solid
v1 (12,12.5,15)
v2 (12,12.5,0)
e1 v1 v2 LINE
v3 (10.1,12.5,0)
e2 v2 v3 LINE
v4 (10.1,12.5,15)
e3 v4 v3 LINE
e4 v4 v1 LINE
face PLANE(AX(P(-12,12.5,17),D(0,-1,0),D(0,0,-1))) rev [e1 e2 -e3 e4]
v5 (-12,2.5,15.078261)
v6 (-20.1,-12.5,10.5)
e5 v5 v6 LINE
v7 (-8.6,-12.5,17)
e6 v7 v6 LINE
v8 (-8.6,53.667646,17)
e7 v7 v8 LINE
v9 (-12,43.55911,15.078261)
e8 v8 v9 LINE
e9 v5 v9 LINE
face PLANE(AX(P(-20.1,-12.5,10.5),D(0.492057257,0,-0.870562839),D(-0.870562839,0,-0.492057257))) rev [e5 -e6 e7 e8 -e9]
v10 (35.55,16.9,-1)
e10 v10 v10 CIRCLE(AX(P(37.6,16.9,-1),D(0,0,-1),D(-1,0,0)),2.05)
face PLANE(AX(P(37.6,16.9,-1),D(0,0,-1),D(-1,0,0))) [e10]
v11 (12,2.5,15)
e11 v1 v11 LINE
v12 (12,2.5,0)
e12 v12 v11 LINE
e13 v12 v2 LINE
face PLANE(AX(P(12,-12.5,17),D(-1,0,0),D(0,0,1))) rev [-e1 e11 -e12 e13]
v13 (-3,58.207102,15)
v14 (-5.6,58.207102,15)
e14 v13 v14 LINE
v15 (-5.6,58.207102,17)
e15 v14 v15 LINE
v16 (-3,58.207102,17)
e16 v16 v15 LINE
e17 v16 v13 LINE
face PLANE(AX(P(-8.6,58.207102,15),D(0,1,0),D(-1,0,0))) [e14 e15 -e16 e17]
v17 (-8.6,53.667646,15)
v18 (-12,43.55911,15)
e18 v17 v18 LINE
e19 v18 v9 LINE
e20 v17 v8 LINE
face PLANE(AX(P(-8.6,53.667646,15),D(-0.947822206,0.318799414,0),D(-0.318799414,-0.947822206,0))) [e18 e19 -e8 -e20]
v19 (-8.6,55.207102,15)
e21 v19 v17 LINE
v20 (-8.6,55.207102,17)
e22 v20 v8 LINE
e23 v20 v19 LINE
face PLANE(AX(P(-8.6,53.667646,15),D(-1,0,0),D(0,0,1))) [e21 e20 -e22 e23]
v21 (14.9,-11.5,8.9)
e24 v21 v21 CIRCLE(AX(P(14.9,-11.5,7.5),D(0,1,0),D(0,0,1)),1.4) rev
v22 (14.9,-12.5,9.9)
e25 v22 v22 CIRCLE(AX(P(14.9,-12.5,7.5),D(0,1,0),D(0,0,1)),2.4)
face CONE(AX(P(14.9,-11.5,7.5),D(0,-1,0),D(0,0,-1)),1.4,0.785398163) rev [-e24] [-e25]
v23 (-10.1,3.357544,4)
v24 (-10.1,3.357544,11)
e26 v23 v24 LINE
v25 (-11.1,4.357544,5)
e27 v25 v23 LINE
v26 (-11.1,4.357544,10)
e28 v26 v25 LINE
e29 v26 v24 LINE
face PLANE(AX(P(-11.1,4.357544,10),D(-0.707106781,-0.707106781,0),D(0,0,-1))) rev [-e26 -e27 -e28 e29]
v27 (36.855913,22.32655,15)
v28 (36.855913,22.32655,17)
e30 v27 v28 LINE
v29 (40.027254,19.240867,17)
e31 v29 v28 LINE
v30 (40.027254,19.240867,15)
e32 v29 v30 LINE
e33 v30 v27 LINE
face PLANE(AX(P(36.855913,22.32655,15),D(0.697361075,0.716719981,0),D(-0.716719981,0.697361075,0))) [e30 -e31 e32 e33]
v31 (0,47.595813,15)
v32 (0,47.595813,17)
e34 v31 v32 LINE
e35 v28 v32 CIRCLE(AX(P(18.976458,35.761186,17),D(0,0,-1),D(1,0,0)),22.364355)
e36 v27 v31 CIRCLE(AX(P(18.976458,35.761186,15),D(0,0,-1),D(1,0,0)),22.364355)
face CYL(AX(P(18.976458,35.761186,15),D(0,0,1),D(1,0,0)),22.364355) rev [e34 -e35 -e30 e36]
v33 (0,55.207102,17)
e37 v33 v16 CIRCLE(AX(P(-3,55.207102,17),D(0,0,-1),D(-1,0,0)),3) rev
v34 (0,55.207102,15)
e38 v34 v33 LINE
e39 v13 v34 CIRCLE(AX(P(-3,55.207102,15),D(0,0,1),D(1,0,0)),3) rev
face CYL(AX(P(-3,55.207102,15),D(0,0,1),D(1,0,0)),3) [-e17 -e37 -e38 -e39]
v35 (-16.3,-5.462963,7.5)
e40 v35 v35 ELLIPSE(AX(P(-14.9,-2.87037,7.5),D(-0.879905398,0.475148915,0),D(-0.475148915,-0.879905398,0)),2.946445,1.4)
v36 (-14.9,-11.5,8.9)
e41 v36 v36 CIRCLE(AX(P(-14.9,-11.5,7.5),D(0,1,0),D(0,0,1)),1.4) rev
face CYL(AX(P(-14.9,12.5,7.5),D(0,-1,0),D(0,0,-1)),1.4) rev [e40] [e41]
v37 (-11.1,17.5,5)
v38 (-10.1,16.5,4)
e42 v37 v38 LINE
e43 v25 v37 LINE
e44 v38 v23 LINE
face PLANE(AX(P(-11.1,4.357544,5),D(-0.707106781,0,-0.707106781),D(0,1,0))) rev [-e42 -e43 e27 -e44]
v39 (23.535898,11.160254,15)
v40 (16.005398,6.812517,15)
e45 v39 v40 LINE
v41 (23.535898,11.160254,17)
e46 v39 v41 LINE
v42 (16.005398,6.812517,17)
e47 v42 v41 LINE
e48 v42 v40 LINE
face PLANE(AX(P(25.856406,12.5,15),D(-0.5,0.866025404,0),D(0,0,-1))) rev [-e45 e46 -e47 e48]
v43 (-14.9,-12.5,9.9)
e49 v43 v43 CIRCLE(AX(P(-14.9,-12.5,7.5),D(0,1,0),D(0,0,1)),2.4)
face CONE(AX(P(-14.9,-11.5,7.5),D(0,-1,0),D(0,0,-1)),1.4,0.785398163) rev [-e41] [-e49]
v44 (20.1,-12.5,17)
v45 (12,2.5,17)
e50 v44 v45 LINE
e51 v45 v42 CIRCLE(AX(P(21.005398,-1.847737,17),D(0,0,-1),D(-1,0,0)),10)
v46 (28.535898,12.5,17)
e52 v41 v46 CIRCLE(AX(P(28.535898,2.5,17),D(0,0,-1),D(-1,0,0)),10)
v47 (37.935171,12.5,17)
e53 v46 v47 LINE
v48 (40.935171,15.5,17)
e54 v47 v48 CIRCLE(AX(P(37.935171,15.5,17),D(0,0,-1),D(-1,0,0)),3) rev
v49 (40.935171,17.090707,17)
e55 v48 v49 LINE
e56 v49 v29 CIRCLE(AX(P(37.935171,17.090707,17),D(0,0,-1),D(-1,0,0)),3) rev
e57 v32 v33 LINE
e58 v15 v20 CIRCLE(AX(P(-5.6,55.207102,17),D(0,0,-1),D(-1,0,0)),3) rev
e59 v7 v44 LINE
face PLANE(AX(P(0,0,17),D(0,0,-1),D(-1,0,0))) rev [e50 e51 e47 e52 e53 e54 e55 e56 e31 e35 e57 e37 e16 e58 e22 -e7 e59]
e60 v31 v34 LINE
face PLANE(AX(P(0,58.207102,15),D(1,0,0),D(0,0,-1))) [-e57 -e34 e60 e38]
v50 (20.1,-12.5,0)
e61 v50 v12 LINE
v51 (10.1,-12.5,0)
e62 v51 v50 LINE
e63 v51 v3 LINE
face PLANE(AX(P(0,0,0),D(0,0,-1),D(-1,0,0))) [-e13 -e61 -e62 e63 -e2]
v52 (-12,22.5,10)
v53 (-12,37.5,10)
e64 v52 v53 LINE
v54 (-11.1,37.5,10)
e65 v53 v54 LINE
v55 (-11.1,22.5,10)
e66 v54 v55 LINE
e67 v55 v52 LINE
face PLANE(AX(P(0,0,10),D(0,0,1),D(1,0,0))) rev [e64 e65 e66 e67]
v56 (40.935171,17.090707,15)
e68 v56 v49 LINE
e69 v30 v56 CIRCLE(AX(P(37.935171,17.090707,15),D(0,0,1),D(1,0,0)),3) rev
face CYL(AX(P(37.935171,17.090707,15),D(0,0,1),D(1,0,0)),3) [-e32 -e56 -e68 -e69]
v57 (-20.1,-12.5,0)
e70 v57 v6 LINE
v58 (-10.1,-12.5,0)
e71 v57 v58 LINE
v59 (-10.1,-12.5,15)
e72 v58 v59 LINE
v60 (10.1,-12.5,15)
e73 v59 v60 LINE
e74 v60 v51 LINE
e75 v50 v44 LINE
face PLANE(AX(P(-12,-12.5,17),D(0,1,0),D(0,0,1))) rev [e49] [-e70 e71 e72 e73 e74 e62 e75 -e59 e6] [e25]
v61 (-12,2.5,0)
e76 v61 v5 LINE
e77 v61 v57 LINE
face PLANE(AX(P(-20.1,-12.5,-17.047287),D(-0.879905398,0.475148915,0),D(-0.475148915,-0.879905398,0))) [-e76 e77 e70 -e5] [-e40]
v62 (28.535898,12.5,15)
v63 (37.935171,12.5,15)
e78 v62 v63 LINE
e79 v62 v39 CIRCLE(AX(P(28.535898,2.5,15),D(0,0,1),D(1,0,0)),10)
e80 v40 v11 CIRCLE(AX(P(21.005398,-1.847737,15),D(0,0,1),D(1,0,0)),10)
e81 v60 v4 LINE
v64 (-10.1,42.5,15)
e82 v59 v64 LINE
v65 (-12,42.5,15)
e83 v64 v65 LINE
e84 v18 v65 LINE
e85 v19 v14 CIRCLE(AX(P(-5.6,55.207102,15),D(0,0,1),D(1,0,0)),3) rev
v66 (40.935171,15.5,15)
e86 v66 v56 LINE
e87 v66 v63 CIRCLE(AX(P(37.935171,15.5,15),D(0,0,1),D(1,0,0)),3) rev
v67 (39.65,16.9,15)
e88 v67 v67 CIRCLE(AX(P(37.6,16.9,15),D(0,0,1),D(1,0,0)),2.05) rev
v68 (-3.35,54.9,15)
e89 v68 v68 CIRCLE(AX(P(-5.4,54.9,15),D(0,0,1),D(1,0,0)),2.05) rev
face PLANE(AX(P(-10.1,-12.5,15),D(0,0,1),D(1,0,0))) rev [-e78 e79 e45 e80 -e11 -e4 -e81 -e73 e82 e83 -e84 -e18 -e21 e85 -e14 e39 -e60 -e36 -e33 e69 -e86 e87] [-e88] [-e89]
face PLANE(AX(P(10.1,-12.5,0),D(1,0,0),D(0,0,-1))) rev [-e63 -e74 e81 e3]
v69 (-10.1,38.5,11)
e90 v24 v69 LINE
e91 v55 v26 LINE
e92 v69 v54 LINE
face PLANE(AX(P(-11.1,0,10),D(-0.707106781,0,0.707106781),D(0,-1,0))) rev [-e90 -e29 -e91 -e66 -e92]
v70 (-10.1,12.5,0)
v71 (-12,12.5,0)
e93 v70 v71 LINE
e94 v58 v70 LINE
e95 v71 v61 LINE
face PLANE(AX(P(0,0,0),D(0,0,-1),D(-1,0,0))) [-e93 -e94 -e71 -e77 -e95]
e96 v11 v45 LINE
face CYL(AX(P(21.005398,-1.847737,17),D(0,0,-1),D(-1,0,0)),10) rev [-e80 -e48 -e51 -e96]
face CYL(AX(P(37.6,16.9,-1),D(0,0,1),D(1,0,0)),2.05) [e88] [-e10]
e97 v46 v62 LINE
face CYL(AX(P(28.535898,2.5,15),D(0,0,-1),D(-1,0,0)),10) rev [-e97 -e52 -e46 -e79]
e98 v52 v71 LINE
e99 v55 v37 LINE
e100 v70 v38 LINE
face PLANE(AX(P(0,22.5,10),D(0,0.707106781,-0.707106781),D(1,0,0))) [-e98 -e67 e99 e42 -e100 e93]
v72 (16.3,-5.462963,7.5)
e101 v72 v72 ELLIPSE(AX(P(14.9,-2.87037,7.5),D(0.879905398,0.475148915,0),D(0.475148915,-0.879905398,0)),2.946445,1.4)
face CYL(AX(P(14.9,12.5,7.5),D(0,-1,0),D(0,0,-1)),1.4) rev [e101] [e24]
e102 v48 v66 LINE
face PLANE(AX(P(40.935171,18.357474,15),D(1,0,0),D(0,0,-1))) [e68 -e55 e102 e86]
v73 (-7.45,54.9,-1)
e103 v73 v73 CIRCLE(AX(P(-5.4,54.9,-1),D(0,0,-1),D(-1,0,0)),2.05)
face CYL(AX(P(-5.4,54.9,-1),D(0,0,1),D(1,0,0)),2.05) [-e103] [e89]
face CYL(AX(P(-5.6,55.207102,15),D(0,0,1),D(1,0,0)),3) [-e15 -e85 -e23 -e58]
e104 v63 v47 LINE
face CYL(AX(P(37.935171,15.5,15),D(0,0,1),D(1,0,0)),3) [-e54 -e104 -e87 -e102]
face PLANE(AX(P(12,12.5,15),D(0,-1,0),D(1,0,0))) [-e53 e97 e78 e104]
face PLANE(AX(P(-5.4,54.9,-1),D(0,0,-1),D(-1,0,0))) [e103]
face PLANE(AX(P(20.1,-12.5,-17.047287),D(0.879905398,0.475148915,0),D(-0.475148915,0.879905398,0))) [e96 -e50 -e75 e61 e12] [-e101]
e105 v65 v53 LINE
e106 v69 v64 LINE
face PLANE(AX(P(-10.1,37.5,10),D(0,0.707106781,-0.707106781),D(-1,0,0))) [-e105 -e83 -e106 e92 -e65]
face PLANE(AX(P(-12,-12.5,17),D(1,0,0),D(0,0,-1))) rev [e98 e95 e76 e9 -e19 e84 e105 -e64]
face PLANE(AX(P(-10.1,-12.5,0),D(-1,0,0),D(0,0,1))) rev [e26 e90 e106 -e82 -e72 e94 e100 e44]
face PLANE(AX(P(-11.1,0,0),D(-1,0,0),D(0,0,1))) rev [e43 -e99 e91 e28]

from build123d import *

# Parameters (mm, degrees)
SKETCH1_W               = 24
SKETCH1_H               = 25
BOSS_EXTRUDE1_DEPTH     = 17
SKETCH2_W               = 20.2
SKETCH2_H               = 15
CUT_EXTRUDE1_DEPTH      = 33.526911935
BOSS_EXTRUDE2_DEPTH     = 17
SKETCH5_R               = 1.4
CUT_EXTRUDE5_DEPTH      = 37.304407446
BOSS_EXTRUDE3_DEPTH     = 2
CUT_EXTRUDE4_DEPTH      = 74.16252394
CUT_EXTRUDE4_DEPTH_BACK = 74.16252394
SKETCH7_R               = 2.05
BOSS_EXTRUDE4_DEPTH     = 16
CHAMFER1_SIZE           = 1
CHAMFER2_SIZE           = 8
CHAMFER2_SIZE2          = 13.856406461
FILLET1_R               = 10
SKETCH8_W               = 1.9
SKETCH8_H               = 25
BOSS_EXTRUDE5_DEPTH     = 5
CHAMFER5_SIZE           = 5
CHAMFER6_SIZE           = 10
FILLET5_R               = 3
SKETCH9_W               = 5
SKETCH9_H               = 20.312892552
CUT_EXTRUDE6_DEPTH      = 1
CHAMFER7_SIZE           = 1


# Some blends are built 0.0001 mm under size
with BuildPart() as part:
    # Sketch1 → Boss-Extrude1 (new body)
    with BuildSketch(Plane.XY):
        Rectangle(SKETCH1_W, SKETCH1_H)
    extrude(amount=BOSS_EXTRUDE1_DEPTH)

    # Sketch2 → Cut-Extrude1 (cut, through all)
    with BuildSketch(Plane(origin=(0, 12.5, 0), x_dir=(1, 0, 0), z_dir=(0, 1, 0))):
        with Locations((0, -7.5)):
            Rectangle(SKETCH2_W, SKETCH2_H)
    extrude(amount=-CUT_EXTRUDE1_DEPTH, mode=Mode.SUBTRACT)

    # Sketch3 → Boss-Extrude2 (add)
    with BuildSketch(Plane.XY.offset(17)):
        Polygon((-12, -12.5), (-20.1, -12.5), (-12, 2.5), align=None)
        Polygon((12, -12.5), (20.1, -12.5), (12, 2.5), align=None)
    extrude(amount=-BOSS_EXTRUDE2_DEPTH)

    # Sketch5 → Cut-Extrude5 (cut, through all)
    with BuildSketch(Plane.XZ.offset(12.5)):
        with Locations(Location((-14.9, 7.5, 0), (0, 0, 270))):
            Circle(SKETCH5_R)
        with Locations(Location((14.9, 7.5, 0), (0, 0, 270))):
            Circle(SKETCH5_R)
    extrude(amount=-CUT_EXTRUDE5_DEPTH, mode=Mode.SUBTRACT)

    # Sketch6 → Boss-Extrude3 (add)
    with BuildSketch(Plane.XY.offset(17)):
        with BuildLine():
            Line((12, 12.5), (40.935171065, 12.5))
            Line((40.935171065, 12.5), (40.935171065, 18.357473763))
            Line((40.935171065, 18.357473763), (36.855912663, 22.32654969))
            ThreePointArc((36.855912663, 22.32654969), (6.329925709, 17.315872383), (0, 47.595813056))
            Line((0, 47.595813056), (0, 58.207101621))
            Line((0, 58.207101621), (-8.6, 58.207101621))
            Line((-8.6, 58.207101621), (-8.6, 53.667646312))
            Line((-8.6, 53.667646312), (-12, 43.559109862))
            Line((-12, 43.559109862), (-12, 12.5))
            Line((-12, 12.5), (12, 12.5))
        make_face()
    extrude(amount=-BOSS_EXTRUDE3_DEPTH)

    # Sketch4 → Cut-Extrude4 (cut, two sides: drawn at the far end of the back side and taken through both)
    with BuildSketch(Plane(origin=(0, 0, 0), x_dir=(1, 0, 0), z_dir=(0, 1, 0)).offset(-CUT_EXTRUDE4_DEPTH_BACK)):
        Polygon((-8.6, -17), (-20.1, -17), (-20.1, -10.5), align=None)
    extrude(amount=CUT_EXTRUDE4_DEPTH + CUT_EXTRUDE4_DEPTH_BACK, mode=Mode.SUBTRACT)

    # Sketch7 → Boss-Extrude4 (add)
    with BuildSketch(Plane(origin=(0, 0, 15), x_dir=(-1, 0, 0), z_dir=(0, 0, -1))):
        with Locations(Location((-37.6, 16.9, 0), (0, 0, 180))):
            Circle(SKETCH7_R)
        with Locations(Location((5.4, 54.9, 0), (0, 0, 180))):
            Circle(SKETCH7_R)
    extrude(amount=BOSS_EXTRUDE4_DEPTH)

    # Chamfer1
    chamfer1_edges = [part.edges().sort_by_distance(p)[0] for p in [
        (-14.9, -12.5, 8.9),
        (14.9, -12.5, 8.9),
    ]]
    chamfer(chamfer1_edges, length=CHAMFER1_SIZE)

    # Chamfer2
    chamfer2_edges = [part.edges().sort_by_distance(p)[0] for p in [
        (12, 12.5, 16),
    ]]
    chamfer2_side = [part.faces().sort_by_distance(p)[0] for p in [
        (12, 7.5, 8.5),
    ]]
    chamfer(chamfer2_edges, length=CHAMFER2_SIZE, length2=CHAMFER2_SIZE2, reference=chamfer2_side[0])

    # Fillet1
    # the kernel refuses this fillet: 10 mm, written as the material it adds along each edge
    with BuildSketch(Plane(origin=(12, 4.5, 15), x_dir=(0.8660254037844397, 0.4999999999999979, 0), z_dir=(0, 0, 1))) as fillet1_piece_1:
        with BuildLine():
            CenterArc((4.625034769, -10), FILLET1_R, 90, 34.229107271)
            Line((-1, -1.732050808), (-1.112500695, -1.566691824))
            ThreePointArc((-1.112500695, -1.566691824), (-0.673205081, -0.766025404), (-0.173205081, 0.1))
            Line((-0.173205081, 0.1), (0, 0.2))
            Line((0, 0.2), (4.625034769, 0.2))
            Line((4.625034769, 0.2), (4.625034769, 0))
        make_face()
    extrude(amount=2)
    with BuildSketch(Plane(origin=(25.856406461, 12.5, 15), x_dir=(1, 0, 0), z_dir=(0, 0, 1))) as fillet1_piece_2:
        with BuildLine():
            CenterArc((FILLET1_R * 0.267949192431, -FILLET1_R), FILLET1_R, 90, 30)
            Line((-FILLET1_R * 0.232050807569, -FILLET1_R * 0.133974596216), (-FILLET1_R * 0.242050807569, -FILLET1_R * 0.11665408814))
            Line((-FILLET1_R * 0.242050807569, -FILLET1_R * 0.11665408814), (-FILLET1_R * 0.00535898384862, FILLET1_R * 0.02))
            Line((-FILLET1_R * 0.00535898384862, FILLET1_R * 0.02), (FILLET1_R * 0.267949192431, FILLET1_R * 0.02))
            Line((FILLET1_R * 0.267949192431, FILLET1_R * 0.02), (FILLET1_R * 0.267949192431, 0))
        make_face()
    extrude(amount=2)

    # Sketch8 → Boss-Extrude5 (add)
    with BuildSketch(Plane(origin=(0, 0, 15), x_dir=(-1, 0, 0), z_dir=(0, 0, -1))):
        with Locations((11.05, 25)):
            Rectangle(SKETCH8_W, SKETCH8_H)
    extrude(amount=BOSS_EXTRUDE5_DEPTH)

    # Chamfer5
    chamfer5_edges = [part.edges().sort_by_distance(p)[0] for p in [
        (-11.05, 37.5, 15),
    ]]
    chamfer(chamfer5_edges, length=CHAMFER5_SIZE - 0.0001)  # a hair under: the kernel refuses the full size

    # Chamfer6
    chamfer6_edges = [part.edges().sort_by_distance(p)[0] for p in [
        (-11.05, 12.5, 10),
    ]]
    chamfer(chamfer6_edges, length=CHAMFER6_SIZE - 0.0001)  # a hair under: the kernel refuses the full size

    # Fillet5
    fillet5_edges = [part.edges().sort_by_distance(p)[0] for p in [
        (40.935171065, 18.357473763, 16),
        (40.935171065, 12.5, 16),
        (-8.6, 58.207101621, 16),
        (0, 58.207101621, 16),
    ]]
    fillet(fillet5_edges, radius=FILLET5_R)

    # Sketch9 → Cut-Extrude6 (cut)
    with BuildSketch(Plane(origin=(-10.1, 0, 0), x_dir=(0, 0, -1), z_dir=(1, 0, 0))):
        with Locations((-7.5, 14.513989876)):
            Rectangle(SKETCH9_W, SKETCH9_H)
    extrude(amount=-CUT_EXTRUDE6_DEPTH, mode=Mode.SUBTRACT)

    # Chamfer7
    chamfer7_edges = [part.edges().sort_by_distance(p)[0] for p in [
        (-10.1, 10.9287218, 5),
        (-10.1, 4.3575436, 7.5),
        (-10.1, 20.9287718, 10),
    ]]
    chamfer(chamfer7_edges, length=CHAMFER7_SIZE - 0.0001)  # a hair under: the kernel refuses the full size


solid = part.part
